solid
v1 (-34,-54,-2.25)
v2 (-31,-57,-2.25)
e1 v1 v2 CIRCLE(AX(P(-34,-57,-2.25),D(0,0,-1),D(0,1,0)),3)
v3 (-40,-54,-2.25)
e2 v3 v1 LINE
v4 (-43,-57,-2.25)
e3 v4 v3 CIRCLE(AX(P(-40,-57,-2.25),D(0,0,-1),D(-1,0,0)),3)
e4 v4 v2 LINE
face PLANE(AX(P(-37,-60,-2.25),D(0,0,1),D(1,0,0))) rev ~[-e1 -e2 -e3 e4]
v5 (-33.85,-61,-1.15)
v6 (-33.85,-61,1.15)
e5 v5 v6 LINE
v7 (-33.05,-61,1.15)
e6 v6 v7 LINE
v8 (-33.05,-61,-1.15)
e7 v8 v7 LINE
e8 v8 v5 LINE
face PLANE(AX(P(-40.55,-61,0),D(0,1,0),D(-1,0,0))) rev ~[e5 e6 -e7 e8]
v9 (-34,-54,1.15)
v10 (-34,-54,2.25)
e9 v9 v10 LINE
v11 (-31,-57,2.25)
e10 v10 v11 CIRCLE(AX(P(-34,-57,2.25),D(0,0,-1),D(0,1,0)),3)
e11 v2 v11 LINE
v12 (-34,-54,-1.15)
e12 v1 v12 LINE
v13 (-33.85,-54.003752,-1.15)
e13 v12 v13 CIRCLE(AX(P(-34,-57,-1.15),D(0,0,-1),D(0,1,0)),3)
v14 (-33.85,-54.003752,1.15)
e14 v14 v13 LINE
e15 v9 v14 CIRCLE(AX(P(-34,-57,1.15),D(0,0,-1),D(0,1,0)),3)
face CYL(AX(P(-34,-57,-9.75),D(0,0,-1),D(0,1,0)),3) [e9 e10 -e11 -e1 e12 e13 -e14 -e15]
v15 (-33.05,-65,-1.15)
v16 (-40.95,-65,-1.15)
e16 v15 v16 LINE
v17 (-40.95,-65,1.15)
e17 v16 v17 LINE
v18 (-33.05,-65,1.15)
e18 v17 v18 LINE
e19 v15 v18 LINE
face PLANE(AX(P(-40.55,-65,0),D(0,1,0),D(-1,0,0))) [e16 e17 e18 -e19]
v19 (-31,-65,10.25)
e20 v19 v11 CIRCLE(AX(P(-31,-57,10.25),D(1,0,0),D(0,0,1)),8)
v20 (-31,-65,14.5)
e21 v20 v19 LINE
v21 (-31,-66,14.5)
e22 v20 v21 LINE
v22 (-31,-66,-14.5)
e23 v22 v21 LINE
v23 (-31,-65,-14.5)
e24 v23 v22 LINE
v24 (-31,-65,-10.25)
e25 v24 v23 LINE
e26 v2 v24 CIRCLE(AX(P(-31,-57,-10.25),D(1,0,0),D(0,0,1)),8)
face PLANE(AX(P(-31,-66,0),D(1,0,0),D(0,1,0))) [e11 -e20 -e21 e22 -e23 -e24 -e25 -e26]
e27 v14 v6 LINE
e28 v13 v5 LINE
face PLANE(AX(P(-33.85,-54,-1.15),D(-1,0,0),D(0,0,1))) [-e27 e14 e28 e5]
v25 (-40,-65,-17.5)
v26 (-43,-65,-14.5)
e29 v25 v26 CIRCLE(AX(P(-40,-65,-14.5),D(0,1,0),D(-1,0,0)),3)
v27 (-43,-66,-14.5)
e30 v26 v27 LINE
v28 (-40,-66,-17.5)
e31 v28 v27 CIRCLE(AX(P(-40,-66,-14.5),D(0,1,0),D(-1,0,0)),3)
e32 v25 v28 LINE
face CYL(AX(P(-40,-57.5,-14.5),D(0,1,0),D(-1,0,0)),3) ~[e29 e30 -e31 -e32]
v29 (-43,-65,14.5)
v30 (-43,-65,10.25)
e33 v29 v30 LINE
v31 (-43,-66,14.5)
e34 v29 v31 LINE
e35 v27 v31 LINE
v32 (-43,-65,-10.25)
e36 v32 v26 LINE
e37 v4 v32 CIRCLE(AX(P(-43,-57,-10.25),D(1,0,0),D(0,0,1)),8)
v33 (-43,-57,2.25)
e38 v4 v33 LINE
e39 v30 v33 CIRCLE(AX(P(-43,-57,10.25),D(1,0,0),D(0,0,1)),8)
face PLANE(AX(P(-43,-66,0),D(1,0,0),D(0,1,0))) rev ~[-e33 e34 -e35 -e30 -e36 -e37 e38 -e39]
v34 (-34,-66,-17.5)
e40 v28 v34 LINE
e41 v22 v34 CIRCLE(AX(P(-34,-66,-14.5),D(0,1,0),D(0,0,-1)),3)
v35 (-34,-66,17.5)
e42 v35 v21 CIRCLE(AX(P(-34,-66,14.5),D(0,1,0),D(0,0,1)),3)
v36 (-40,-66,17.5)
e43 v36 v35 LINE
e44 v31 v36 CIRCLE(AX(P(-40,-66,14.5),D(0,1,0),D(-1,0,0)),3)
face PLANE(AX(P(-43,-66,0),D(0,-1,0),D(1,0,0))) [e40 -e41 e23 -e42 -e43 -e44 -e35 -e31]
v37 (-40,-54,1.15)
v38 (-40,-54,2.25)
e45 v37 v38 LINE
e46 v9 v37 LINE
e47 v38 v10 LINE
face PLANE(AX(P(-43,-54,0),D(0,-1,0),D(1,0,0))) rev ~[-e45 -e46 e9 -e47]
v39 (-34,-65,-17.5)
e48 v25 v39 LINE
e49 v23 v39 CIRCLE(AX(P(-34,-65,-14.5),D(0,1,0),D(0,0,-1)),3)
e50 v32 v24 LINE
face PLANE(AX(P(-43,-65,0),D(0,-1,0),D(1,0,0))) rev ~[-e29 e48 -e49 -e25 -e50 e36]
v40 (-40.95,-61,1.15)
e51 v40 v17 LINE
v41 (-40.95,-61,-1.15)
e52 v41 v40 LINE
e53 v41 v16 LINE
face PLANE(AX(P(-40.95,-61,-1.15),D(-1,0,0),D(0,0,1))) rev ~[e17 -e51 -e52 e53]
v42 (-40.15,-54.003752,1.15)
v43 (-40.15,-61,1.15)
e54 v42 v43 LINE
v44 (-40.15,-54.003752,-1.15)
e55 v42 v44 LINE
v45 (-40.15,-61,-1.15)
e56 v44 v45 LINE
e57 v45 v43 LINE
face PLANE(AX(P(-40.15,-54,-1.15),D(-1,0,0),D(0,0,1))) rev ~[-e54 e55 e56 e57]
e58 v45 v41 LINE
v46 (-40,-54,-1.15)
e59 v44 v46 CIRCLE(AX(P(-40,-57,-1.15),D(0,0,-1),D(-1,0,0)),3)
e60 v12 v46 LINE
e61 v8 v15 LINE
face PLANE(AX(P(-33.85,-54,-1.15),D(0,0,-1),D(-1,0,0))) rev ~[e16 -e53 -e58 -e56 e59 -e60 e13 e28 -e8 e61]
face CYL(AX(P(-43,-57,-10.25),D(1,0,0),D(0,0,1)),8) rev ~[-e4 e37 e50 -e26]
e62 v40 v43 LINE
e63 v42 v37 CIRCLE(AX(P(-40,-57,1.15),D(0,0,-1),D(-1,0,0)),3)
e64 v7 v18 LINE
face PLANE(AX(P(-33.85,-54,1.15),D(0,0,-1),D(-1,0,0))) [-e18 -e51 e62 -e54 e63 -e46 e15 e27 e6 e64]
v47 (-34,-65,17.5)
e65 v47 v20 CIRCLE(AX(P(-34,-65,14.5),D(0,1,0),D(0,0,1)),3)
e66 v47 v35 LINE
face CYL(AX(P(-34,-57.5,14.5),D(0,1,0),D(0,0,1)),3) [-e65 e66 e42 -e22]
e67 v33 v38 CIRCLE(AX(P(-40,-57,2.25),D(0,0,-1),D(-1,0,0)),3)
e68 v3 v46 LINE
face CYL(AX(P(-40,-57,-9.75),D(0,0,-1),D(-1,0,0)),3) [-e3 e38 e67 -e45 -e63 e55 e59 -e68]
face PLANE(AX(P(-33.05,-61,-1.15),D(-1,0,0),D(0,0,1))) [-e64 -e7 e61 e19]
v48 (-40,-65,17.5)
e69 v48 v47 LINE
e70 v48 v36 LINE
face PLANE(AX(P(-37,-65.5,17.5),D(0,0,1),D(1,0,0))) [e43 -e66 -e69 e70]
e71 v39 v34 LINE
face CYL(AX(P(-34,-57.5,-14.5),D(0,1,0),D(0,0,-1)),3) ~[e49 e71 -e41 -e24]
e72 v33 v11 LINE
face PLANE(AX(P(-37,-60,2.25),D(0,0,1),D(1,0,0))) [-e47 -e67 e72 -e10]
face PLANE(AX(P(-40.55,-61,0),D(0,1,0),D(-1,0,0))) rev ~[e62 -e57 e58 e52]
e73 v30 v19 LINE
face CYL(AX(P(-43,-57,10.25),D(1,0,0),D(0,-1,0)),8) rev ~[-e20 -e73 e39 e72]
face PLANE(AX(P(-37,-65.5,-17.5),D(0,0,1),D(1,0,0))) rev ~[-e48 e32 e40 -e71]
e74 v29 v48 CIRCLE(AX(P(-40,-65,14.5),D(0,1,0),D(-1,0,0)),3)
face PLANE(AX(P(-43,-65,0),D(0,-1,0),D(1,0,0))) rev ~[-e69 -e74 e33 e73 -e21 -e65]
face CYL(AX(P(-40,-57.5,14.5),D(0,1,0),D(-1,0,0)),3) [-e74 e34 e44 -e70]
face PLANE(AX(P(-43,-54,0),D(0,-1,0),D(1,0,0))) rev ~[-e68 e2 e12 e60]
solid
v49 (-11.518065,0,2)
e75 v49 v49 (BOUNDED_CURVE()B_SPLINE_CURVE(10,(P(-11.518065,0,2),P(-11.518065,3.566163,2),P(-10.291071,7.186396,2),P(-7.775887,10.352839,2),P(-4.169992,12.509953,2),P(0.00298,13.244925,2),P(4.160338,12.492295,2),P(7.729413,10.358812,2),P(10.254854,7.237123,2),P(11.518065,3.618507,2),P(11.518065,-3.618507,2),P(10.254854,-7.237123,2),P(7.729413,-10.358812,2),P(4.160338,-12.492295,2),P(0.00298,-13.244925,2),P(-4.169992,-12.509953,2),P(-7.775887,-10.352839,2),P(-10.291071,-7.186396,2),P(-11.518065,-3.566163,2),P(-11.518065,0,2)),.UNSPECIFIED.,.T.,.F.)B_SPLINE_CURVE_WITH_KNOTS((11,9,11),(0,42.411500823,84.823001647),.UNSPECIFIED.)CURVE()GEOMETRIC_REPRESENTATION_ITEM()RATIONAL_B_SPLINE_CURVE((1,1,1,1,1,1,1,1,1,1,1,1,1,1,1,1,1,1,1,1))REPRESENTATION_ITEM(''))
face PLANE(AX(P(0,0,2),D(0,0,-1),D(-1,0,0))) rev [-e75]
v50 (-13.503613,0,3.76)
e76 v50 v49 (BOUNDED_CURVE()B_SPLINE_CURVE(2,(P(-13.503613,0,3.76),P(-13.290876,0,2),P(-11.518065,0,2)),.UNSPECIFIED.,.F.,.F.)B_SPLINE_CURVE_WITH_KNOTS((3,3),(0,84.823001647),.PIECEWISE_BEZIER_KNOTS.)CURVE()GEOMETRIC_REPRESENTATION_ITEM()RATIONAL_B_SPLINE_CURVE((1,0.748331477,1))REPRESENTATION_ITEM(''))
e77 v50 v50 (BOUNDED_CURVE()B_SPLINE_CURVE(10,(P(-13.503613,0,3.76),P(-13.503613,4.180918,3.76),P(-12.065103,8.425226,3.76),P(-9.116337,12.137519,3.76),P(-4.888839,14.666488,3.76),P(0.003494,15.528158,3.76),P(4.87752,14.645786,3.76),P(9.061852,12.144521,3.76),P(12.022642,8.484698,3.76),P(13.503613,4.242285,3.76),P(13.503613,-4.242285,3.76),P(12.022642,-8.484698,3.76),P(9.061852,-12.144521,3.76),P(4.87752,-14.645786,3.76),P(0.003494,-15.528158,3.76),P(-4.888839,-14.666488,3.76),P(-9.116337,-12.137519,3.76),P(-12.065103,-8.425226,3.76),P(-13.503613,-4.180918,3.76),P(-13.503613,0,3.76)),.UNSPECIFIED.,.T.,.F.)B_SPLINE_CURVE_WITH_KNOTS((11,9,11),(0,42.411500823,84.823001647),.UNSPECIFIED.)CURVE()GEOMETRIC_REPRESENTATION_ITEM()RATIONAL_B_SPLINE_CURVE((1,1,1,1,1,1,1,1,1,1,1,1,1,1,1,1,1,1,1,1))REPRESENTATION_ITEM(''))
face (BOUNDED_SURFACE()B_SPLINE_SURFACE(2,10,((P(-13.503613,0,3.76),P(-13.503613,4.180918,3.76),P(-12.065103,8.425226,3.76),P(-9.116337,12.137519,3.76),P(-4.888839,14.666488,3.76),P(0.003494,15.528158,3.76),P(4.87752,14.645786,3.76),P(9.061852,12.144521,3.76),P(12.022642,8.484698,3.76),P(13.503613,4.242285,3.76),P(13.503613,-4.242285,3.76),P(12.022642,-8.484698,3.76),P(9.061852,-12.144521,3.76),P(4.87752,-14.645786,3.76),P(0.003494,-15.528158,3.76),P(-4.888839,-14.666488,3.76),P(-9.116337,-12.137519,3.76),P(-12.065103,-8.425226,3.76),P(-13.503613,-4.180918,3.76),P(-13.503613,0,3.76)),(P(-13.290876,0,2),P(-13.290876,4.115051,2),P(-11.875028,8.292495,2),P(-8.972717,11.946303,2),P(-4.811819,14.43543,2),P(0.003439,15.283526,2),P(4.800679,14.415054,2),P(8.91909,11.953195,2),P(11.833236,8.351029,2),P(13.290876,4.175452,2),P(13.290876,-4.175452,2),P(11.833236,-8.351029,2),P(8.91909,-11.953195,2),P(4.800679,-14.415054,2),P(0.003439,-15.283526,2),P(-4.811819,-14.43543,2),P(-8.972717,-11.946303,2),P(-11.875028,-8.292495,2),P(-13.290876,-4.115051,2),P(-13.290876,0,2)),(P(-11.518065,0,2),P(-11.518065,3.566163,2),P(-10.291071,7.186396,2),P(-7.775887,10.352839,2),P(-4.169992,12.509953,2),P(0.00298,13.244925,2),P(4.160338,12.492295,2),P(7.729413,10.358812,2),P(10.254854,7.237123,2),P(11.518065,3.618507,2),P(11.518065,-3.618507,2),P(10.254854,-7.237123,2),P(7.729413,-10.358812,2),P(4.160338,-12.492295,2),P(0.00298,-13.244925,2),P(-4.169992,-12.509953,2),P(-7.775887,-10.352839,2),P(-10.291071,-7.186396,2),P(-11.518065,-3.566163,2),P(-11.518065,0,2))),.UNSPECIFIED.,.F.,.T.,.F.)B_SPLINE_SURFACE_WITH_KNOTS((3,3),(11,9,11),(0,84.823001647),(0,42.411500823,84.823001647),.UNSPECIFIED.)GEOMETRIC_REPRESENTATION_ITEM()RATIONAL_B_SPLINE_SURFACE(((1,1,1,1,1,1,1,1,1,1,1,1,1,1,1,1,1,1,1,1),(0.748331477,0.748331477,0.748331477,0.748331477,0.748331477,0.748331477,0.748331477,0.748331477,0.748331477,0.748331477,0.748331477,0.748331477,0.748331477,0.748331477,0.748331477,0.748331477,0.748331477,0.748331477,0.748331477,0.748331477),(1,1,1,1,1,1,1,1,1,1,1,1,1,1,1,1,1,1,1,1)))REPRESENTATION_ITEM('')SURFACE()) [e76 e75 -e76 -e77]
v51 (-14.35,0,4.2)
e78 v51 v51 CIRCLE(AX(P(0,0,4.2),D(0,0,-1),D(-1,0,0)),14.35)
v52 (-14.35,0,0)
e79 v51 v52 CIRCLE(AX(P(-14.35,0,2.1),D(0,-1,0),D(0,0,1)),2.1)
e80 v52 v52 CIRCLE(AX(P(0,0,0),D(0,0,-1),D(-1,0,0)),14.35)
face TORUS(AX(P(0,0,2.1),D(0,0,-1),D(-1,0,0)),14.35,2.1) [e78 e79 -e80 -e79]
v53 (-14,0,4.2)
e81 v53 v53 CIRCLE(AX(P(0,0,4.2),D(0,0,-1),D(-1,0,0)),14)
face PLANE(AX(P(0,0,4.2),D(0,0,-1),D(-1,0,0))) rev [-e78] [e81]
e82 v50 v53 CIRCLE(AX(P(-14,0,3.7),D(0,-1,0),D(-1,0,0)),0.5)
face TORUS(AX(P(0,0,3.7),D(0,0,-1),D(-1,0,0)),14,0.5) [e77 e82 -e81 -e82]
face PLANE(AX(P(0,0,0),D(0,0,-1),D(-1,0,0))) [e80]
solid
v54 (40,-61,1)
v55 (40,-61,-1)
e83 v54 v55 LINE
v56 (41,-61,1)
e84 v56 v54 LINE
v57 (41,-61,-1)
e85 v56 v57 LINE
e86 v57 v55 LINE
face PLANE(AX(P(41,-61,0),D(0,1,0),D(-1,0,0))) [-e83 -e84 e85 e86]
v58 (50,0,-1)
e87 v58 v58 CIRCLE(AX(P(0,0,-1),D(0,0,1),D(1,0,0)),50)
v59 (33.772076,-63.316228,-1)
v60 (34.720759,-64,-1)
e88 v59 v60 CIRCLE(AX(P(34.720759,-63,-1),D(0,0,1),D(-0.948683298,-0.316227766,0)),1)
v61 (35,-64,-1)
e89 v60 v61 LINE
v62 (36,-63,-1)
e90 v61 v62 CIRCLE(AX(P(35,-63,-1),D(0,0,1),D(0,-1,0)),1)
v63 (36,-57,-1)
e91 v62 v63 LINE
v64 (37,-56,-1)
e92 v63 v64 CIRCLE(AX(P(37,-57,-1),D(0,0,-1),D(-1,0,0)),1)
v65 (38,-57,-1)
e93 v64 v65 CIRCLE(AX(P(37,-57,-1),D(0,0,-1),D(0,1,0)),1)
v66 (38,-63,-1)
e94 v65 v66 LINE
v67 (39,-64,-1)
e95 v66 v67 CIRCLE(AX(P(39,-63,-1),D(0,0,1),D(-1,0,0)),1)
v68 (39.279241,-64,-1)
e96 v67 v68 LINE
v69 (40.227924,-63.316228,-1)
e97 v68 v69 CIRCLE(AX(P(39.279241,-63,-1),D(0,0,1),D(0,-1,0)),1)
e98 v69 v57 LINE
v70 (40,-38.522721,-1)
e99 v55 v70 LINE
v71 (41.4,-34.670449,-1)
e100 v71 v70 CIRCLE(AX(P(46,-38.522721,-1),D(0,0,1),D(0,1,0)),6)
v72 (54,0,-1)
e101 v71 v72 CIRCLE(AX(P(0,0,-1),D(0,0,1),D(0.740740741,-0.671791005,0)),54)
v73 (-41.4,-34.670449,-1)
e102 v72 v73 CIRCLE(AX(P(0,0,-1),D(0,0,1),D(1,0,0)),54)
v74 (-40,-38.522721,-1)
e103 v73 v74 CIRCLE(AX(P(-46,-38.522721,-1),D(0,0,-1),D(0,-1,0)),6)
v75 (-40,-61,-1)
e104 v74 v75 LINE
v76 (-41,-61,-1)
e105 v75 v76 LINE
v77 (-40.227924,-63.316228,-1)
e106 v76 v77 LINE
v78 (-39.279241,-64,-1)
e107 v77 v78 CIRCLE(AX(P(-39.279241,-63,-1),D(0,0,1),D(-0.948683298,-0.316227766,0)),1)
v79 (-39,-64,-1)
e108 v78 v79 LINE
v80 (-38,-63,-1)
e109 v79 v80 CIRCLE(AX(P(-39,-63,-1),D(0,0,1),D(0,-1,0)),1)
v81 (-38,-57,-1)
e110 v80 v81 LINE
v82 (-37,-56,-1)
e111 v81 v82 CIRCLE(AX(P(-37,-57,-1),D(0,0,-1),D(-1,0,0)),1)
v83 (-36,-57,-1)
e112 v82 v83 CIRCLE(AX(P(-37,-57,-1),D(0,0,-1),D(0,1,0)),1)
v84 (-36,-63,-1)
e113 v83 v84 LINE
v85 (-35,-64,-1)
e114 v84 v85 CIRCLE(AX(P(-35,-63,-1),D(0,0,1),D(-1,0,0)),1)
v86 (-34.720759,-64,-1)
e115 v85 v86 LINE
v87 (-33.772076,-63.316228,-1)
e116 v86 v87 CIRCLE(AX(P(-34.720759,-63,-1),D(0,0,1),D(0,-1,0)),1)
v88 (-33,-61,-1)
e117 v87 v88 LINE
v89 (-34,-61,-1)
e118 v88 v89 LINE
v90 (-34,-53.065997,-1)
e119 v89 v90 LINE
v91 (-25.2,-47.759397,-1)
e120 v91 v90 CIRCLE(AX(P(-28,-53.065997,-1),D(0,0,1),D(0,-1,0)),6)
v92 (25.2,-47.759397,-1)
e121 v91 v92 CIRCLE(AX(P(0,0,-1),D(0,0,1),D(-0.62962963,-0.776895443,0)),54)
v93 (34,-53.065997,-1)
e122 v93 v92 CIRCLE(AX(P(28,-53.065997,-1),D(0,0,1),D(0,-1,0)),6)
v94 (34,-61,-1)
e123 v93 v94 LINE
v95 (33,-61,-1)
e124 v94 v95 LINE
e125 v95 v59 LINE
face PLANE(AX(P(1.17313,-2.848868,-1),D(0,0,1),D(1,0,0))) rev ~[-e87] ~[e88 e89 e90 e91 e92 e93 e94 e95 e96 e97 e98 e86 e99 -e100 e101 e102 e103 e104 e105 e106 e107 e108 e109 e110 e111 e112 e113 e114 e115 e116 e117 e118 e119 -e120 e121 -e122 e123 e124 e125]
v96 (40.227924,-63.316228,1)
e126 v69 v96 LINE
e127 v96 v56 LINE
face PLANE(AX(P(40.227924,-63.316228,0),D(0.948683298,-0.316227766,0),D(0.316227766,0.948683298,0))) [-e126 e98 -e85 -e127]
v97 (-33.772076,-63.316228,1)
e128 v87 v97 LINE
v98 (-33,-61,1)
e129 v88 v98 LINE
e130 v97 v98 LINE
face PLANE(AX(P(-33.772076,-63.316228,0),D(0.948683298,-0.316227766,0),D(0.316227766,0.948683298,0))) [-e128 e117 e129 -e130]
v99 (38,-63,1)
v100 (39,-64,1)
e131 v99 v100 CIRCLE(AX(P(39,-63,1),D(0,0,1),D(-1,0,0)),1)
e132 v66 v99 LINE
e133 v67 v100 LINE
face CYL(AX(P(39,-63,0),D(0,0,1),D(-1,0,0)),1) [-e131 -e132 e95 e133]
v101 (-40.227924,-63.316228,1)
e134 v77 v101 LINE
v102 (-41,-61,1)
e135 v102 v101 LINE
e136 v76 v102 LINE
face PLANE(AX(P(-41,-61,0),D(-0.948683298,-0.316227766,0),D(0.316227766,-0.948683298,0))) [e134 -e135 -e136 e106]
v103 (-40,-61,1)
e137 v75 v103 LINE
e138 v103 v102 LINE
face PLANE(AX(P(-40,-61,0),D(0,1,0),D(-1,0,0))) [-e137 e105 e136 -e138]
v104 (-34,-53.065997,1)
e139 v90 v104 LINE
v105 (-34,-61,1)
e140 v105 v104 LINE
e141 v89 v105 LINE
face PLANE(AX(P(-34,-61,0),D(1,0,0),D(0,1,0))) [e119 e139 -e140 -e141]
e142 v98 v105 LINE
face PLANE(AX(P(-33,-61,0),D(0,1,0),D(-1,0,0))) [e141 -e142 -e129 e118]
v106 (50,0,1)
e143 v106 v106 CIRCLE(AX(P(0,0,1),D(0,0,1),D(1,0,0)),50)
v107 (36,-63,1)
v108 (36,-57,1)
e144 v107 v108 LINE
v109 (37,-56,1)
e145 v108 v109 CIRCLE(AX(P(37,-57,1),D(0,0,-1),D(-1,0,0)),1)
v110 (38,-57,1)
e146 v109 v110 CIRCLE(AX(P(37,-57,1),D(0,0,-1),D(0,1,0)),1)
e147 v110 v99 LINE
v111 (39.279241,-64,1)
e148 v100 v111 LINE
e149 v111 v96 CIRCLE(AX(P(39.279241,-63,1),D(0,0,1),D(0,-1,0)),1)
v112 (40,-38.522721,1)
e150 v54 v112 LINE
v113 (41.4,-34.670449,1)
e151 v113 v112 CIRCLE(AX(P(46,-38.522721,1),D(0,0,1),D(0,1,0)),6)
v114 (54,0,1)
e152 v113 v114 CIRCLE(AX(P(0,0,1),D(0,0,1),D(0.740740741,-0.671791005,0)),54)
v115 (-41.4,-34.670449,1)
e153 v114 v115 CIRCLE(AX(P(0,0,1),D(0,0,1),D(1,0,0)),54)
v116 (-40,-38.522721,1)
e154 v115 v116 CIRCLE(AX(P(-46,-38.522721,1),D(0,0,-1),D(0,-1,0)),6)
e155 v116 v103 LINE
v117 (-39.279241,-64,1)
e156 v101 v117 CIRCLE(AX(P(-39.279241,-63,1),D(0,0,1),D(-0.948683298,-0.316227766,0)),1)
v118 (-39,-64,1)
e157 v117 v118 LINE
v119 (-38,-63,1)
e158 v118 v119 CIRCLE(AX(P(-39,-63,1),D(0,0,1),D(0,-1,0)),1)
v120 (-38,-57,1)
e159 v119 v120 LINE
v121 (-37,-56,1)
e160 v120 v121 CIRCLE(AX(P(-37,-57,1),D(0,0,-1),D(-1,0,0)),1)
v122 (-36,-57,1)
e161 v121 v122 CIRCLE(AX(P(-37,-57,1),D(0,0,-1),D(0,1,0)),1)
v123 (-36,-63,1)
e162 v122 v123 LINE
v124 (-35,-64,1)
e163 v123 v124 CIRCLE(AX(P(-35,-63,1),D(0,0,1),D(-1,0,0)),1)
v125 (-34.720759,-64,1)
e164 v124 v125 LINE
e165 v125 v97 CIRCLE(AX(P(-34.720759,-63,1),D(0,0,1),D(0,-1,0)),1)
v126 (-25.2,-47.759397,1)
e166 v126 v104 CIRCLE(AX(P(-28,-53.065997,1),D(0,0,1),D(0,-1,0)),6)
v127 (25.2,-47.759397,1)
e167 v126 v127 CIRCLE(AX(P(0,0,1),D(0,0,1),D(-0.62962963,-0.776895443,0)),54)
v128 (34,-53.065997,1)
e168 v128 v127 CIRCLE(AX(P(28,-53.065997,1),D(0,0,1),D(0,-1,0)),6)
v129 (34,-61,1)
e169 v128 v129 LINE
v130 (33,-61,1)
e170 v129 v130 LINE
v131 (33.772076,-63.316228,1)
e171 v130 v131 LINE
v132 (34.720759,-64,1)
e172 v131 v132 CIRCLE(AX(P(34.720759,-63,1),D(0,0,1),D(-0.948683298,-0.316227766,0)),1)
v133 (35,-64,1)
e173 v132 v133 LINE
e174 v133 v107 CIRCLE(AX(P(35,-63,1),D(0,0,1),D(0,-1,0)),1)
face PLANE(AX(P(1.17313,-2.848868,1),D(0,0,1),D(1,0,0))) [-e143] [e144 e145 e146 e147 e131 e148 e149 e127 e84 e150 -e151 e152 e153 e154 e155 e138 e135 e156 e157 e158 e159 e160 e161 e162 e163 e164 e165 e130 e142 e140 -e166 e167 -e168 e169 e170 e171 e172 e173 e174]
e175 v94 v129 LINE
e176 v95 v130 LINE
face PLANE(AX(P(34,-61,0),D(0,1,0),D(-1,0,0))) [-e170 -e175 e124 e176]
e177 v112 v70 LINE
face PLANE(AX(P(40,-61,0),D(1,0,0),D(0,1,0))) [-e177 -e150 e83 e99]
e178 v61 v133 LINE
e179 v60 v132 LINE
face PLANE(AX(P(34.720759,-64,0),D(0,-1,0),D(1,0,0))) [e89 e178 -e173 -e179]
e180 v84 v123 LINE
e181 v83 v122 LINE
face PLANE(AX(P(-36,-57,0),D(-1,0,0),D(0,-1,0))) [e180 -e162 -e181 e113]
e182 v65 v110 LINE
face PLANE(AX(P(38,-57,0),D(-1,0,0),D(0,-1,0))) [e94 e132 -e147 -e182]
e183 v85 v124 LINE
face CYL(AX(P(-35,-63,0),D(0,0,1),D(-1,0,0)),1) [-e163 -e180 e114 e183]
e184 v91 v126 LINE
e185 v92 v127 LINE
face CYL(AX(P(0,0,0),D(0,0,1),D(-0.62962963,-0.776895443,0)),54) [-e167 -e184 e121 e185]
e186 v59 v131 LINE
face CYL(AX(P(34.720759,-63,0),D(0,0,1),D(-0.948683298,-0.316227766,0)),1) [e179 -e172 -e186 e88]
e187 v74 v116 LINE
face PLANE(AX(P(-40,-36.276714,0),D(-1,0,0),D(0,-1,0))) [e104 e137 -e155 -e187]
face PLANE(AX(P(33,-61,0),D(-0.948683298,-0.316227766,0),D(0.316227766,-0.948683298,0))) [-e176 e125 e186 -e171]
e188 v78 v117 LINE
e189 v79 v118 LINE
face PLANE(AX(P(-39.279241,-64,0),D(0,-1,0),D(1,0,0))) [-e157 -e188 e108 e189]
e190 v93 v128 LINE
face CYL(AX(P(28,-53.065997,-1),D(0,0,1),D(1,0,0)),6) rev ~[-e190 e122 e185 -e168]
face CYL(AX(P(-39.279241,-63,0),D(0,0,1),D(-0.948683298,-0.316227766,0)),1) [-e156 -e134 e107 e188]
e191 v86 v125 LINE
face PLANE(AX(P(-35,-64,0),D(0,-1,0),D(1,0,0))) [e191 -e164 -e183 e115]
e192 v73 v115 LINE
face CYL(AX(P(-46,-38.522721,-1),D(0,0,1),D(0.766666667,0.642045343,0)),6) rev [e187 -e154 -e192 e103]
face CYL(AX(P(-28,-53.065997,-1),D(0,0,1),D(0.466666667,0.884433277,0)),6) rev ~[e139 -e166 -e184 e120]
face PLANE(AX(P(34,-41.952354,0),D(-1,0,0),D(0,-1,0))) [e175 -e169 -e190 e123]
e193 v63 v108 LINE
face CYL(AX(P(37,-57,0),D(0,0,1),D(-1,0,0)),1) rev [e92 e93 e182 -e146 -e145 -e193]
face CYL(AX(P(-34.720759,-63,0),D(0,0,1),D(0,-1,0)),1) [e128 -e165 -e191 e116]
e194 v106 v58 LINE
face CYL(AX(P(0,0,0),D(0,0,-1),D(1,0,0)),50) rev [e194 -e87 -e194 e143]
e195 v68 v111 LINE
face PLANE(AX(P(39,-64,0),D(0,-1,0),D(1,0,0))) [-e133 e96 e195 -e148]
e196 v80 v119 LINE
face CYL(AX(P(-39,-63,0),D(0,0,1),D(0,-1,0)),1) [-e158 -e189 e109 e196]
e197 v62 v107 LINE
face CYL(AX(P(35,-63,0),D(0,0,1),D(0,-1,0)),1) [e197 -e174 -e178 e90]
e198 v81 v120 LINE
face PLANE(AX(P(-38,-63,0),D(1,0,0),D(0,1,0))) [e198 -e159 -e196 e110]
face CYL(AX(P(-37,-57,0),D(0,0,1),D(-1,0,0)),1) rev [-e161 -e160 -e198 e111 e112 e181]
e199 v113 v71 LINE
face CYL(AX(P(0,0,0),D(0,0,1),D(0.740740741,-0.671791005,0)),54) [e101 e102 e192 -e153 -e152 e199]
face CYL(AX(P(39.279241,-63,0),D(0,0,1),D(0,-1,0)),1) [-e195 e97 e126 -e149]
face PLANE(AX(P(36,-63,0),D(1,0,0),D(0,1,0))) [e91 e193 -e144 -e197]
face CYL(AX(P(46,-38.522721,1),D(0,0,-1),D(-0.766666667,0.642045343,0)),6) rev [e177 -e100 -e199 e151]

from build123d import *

# Parameters (mm, degrees)
F2_R         = 0.5
F3_R         = 2
F4_R         = 50
F5_DEPTH     = 1
F6_R         = 6
F7_W         = 12
F7_H         = 12
F8_DEPTH     = 2.25
F9_W         = 6.3
F9_H         = 2.3
F9_W_2       = 6
F9_H_2       = 2
F10_DEPTH    = 7
F11_START    = -7
F9_W_3       = 0.8
F11_DEPTH    = 4
F12_W        = 12
F12_H        = 1
F13_DEPTH    = 17.5
F14_R        = 8
F15_T1_DEPTH = 19.5
F15_T3_DEPTH = 16


# Not quite as in the source:
# - a fillet or chamfer that OpenCascade refuses, or shapes differently, is made with other operations: its cross-section is extruded or revolved along the edge and cut away or added


with BuildPart() as f1:
    # F0 (on Front) → F1 (revolve)
    with BuildSketch(Plane.XZ):
        with BuildLine():
            Line((-14.35, 0), (0, 0))
            Line((0, 0), (0, 2))
            Line((0, 2), (-13.5, 2))
            Line((-13.5, 2), (-13.5, 4.2))
            Line((-13.5, 4.2), (-14.35, 4.2))
            ThreePointArc((-14.35, 4.2), (-16.45, 2.1), (-14.35, 0))
        make_face()
    revolve(axis=Axis((0, 0, 1), (0, 0, -1)))

    # F2
    f2_edges = [f1.edges().sort_by_distance(p)[0] for p in [
        (13.5, 0, 4.2),
    ]]
    fillet(f2_edges, radius=F2_R)

    # F3
    f3_edges = [f1.edges().sort_by_distance(p)[0] for p in [
        (13.5, 0, 2),
    ]]
    fillet(f3_edges, radius=F3_R)


with BuildPart() as f5:
    # F4 (on Top) → F5 (new body, symmetric)
    with BuildSketch(Plane.XY):
        with BuildLine():
            ThreePointArc((40, -36.2767142944), (50.3785668712, -19.4422220952), (54, 0))
            ThreePointArc((54, 0), (-19.4422220952, 50.3785668712), (-40, -36.2767142944))
            ThreePointArc((-40, -36.2767142944), (-37.1086677383, -39.2294121635), (-34, -41.9523539268))
            ThreePointArc((-34, -41.9523539268), (0, -54), (34, -41.9523539268))
            ThreePointArc((34, -41.9523539268), (37.1086677383, -39.2294121635), (40, -36.2767142944))
        make_face()
        Circle(F4_R, mode=Mode.SUBTRACT)
        with BuildLine():
            ThreePointArc((-34, -41.9523539268), (-37.1086677383, -39.2294121635), (-40, -36.2767142944))
            Line((-40, -36.2767142944), (-40, -61))
            Line((-40, -61), (-41, -61))
            Line((-41, -61), (-40.227924078, -63.316227766))
            ThreePointArc((-40.227924078, -63.316227766), (-39.8639510646, -63.8112421852), (-39.2792407799, -64))
            Line((-39.2792407799, -64), (-39, -64))
            ThreePointArc((-39, -64), (-38.2928932188, -63.7071067812), (-38, -63))
            Line((-38, -63), (-38, -57))
            ThreePointArc((-38, -57), (-37.7071067812, -56.2928932188), (-37, -56))
            ThreePointArc((-37, -56), (-36.2928932188, -56.2928932188), (-36, -57))
            Line((-36, -57), (-36, -63))
            ThreePointArc((-36, -63), (-35.7071067812, -63.7071067812), (-35, -64))
            Line((-35, -64), (-34.7207592201, -64))
            ThreePointArc((-34.7207592201, -64), (-34.1360489354, -63.8112421852), (-33.772075922, -63.316227766))
            Line((-33.772075922, -63.316227766), (-33, -61))
            Line((-33, -61), (-34, -61))
            Line((-34, -61), (-34, -41.9523539268))
        make_face()
        with BuildLine():
            Line((40, -61), (40, -36.2767142944))
            ThreePointArc((40, -36.2767142944), (37.1086677383, -39.2294121635), (34, -41.9523539268))
            Line((34, -41.9523539268), (34, -61))
            Line((34, -61), (33, -61))
            Line((33, -61), (33.772075922, -63.316227766))
            ThreePointArc((33.772075922, -63.316227766), (34.1360489354, -63.8112421852), (34.7207592201, -64))
            Line((34.7207592201, -64), (35, -64))
            ThreePointArc((35, -64), (35.7071067812, -63.7071067812), (36, -63))
            Line((36, -63), (36, -57))
            ThreePointArc((36, -57), (36.2928932188, -56.2928932188), (37, -56))
            ThreePointArc((37, -56), (37.7071067812, -56.2928932188), (38, -57))
            Line((38, -57), (38, -63))
            ThreePointArc((38, -63), (38.2928932188, -63.7071067812), (39, -64))
            Line((39, -64), (39.2792407799, -64))
            ThreePointArc((39.2792407799, -64), (39.8639510646, -63.8112421852), (40.227924078, -63.316227766))
            Line((40.227924078, -63.316227766), (41, -61))
            Line((41, -61), (40, -61))
        make_face()
    extrude(amount=F5_DEPTH, both=True)

    # F6
    f6_edges = [f5.edges().sort_by_distance(p)[0] for p in [
        (-34, -41.952354, 0),
        (-40, -36.276714, 0),
        (40, -36.276714, 0),
        (34, -41.952354, 0),
    ]]
    fillet(f6_edges, radius=F6_R)


with BuildPart() as f8:
    # F7 (on Top) → F8 (new body, symmetric)
    with BuildSketch(Plane.XY):
        with Locations((-37, -60)):
            Rectangle(F7_W, F7_H)
    extrude(amount=F8_DEPTH, both=True)

    # F9 (on face) → F10 (cut)
    with BuildSketch(Plane(origin=(0, -54, 0), x_dir=(-1, 0, 0), z_dir=(0, 1, 0))):
        with Locations((37, 0)):
            Rectangle(F9_W, F9_H)
        with Locations((37, 0)):
            Rectangle(F9_W_2, F9_H_2, mode=Mode.SUBTRACT)
        with Locations((37, 0)):
            Rectangle(F9_W_2, F9_H_2)
    extrude(amount=-F10_DEPTH, mode=Mode.SUBTRACT)

    # F9 (on face) → F11 (cut)
    with BuildSketch(Plane(origin=(0, -54, 0), x_dir=(-1, 0, 0), z_dir=(0, 1, 0)).offset(F11_START)):
        with Locations((40.55, 0)):
            Rectangle(F9_W_3, F9_H)
        with Locations((37, 0)):
            Rectangle(F9_W, F9_H)
        with Locations((37, 0)):
            Rectangle(F9_W_2, F9_H_2, mode=Mode.SUBTRACT)
        with Locations((37, 0)):
            Rectangle(F9_W_2, F9_H_2)
        with Locations((33.45, 0)):
            Rectangle(F9_W_3, F9_H)
    extrude(amount=-F11_DEPTH, mode=Mode.SUBTRACT)

    # F12 (on Top) → F13 (join, symmetric)
    with BuildSketch(Plane.XY):
        with Locations((-37, -65.5)):
            Rectangle(F12_W, F12_H)
    extrude(amount=F13_DEPTH, both=True)

    # F14
    f14_edges = [f8.edges().sort_by_distance(p)[0] for p in [
        (-37, -65, -2.25),
        (-37, -65, 2.25),
    ]]
    fillet(f14_edges, radius=F14_R)

    # F15: fillet of radius 3 on 6 edges, made by hand

    # F15_s2 → F15_t1 (cut)
    with BuildSketch(Plane.XY.offset(-9.75)):
        with BuildLine():
            ThreePointArc((-34, -54), (-31.8786796564, -54.8786796564), (-31, -57))
            Line((-31, -57), (-31, -54))
            Line((-31, -54), (-34, -54))
        make_face()
        with BuildLine():
            ThreePointArc((-43, -57), (-42.1213203436, -54.8786796564), (-40, -54))
            Line((-40, -54), (-43, -54))
            Line((-43, -54), (-43, -57))
        make_face()
    extrude(amount=F15_T1_DEPTH, mode=Mode.SUBTRACT)

    # F15_s4 → F15_t3 (cut)
    with BuildSketch(Plane.XZ.offset(57.5)):
        with BuildLine():
            ThreePointArc((-43, 14.5), (-42.1213203436, 16.6213203436), (-40, 17.5))
            Line((-40, 17.5), (-43, 17.5))
            Line((-43, 17.5), (-43, 14.5))
        make_face()
        with BuildLine():
            ThreePointArc((-34, 17.5), (-31.8786796564, 16.6213203436), (-31, 14.5))
            Line((-31, 14.5), (-31, 17.5))
            Line((-31, 17.5), (-34, 17.5))
        make_face()
        with BuildLine():
            ThreePointArc((-43, -14.5), (-42.1213203436, -16.6213203436), (-40, -17.5))
            Line((-40, -17.5), (-43, -17.5))
            Line((-43, -17.5), (-43, -14.5))
        make_face()
        with BuildLine():
            ThreePointArc((-34, -17.5), (-31.8786796564, -16.6213203436), (-31, -14.5))
            Line((-31, -14.5), (-31, -17.5))
            Line((-31, -17.5), (-34, -17.5))
        make_face()
    extrude(amount=F15_T3_DEPTH, mode=Mode.SUBTRACT)


solid = Compound([f1.part, f5.part, f8.part])
